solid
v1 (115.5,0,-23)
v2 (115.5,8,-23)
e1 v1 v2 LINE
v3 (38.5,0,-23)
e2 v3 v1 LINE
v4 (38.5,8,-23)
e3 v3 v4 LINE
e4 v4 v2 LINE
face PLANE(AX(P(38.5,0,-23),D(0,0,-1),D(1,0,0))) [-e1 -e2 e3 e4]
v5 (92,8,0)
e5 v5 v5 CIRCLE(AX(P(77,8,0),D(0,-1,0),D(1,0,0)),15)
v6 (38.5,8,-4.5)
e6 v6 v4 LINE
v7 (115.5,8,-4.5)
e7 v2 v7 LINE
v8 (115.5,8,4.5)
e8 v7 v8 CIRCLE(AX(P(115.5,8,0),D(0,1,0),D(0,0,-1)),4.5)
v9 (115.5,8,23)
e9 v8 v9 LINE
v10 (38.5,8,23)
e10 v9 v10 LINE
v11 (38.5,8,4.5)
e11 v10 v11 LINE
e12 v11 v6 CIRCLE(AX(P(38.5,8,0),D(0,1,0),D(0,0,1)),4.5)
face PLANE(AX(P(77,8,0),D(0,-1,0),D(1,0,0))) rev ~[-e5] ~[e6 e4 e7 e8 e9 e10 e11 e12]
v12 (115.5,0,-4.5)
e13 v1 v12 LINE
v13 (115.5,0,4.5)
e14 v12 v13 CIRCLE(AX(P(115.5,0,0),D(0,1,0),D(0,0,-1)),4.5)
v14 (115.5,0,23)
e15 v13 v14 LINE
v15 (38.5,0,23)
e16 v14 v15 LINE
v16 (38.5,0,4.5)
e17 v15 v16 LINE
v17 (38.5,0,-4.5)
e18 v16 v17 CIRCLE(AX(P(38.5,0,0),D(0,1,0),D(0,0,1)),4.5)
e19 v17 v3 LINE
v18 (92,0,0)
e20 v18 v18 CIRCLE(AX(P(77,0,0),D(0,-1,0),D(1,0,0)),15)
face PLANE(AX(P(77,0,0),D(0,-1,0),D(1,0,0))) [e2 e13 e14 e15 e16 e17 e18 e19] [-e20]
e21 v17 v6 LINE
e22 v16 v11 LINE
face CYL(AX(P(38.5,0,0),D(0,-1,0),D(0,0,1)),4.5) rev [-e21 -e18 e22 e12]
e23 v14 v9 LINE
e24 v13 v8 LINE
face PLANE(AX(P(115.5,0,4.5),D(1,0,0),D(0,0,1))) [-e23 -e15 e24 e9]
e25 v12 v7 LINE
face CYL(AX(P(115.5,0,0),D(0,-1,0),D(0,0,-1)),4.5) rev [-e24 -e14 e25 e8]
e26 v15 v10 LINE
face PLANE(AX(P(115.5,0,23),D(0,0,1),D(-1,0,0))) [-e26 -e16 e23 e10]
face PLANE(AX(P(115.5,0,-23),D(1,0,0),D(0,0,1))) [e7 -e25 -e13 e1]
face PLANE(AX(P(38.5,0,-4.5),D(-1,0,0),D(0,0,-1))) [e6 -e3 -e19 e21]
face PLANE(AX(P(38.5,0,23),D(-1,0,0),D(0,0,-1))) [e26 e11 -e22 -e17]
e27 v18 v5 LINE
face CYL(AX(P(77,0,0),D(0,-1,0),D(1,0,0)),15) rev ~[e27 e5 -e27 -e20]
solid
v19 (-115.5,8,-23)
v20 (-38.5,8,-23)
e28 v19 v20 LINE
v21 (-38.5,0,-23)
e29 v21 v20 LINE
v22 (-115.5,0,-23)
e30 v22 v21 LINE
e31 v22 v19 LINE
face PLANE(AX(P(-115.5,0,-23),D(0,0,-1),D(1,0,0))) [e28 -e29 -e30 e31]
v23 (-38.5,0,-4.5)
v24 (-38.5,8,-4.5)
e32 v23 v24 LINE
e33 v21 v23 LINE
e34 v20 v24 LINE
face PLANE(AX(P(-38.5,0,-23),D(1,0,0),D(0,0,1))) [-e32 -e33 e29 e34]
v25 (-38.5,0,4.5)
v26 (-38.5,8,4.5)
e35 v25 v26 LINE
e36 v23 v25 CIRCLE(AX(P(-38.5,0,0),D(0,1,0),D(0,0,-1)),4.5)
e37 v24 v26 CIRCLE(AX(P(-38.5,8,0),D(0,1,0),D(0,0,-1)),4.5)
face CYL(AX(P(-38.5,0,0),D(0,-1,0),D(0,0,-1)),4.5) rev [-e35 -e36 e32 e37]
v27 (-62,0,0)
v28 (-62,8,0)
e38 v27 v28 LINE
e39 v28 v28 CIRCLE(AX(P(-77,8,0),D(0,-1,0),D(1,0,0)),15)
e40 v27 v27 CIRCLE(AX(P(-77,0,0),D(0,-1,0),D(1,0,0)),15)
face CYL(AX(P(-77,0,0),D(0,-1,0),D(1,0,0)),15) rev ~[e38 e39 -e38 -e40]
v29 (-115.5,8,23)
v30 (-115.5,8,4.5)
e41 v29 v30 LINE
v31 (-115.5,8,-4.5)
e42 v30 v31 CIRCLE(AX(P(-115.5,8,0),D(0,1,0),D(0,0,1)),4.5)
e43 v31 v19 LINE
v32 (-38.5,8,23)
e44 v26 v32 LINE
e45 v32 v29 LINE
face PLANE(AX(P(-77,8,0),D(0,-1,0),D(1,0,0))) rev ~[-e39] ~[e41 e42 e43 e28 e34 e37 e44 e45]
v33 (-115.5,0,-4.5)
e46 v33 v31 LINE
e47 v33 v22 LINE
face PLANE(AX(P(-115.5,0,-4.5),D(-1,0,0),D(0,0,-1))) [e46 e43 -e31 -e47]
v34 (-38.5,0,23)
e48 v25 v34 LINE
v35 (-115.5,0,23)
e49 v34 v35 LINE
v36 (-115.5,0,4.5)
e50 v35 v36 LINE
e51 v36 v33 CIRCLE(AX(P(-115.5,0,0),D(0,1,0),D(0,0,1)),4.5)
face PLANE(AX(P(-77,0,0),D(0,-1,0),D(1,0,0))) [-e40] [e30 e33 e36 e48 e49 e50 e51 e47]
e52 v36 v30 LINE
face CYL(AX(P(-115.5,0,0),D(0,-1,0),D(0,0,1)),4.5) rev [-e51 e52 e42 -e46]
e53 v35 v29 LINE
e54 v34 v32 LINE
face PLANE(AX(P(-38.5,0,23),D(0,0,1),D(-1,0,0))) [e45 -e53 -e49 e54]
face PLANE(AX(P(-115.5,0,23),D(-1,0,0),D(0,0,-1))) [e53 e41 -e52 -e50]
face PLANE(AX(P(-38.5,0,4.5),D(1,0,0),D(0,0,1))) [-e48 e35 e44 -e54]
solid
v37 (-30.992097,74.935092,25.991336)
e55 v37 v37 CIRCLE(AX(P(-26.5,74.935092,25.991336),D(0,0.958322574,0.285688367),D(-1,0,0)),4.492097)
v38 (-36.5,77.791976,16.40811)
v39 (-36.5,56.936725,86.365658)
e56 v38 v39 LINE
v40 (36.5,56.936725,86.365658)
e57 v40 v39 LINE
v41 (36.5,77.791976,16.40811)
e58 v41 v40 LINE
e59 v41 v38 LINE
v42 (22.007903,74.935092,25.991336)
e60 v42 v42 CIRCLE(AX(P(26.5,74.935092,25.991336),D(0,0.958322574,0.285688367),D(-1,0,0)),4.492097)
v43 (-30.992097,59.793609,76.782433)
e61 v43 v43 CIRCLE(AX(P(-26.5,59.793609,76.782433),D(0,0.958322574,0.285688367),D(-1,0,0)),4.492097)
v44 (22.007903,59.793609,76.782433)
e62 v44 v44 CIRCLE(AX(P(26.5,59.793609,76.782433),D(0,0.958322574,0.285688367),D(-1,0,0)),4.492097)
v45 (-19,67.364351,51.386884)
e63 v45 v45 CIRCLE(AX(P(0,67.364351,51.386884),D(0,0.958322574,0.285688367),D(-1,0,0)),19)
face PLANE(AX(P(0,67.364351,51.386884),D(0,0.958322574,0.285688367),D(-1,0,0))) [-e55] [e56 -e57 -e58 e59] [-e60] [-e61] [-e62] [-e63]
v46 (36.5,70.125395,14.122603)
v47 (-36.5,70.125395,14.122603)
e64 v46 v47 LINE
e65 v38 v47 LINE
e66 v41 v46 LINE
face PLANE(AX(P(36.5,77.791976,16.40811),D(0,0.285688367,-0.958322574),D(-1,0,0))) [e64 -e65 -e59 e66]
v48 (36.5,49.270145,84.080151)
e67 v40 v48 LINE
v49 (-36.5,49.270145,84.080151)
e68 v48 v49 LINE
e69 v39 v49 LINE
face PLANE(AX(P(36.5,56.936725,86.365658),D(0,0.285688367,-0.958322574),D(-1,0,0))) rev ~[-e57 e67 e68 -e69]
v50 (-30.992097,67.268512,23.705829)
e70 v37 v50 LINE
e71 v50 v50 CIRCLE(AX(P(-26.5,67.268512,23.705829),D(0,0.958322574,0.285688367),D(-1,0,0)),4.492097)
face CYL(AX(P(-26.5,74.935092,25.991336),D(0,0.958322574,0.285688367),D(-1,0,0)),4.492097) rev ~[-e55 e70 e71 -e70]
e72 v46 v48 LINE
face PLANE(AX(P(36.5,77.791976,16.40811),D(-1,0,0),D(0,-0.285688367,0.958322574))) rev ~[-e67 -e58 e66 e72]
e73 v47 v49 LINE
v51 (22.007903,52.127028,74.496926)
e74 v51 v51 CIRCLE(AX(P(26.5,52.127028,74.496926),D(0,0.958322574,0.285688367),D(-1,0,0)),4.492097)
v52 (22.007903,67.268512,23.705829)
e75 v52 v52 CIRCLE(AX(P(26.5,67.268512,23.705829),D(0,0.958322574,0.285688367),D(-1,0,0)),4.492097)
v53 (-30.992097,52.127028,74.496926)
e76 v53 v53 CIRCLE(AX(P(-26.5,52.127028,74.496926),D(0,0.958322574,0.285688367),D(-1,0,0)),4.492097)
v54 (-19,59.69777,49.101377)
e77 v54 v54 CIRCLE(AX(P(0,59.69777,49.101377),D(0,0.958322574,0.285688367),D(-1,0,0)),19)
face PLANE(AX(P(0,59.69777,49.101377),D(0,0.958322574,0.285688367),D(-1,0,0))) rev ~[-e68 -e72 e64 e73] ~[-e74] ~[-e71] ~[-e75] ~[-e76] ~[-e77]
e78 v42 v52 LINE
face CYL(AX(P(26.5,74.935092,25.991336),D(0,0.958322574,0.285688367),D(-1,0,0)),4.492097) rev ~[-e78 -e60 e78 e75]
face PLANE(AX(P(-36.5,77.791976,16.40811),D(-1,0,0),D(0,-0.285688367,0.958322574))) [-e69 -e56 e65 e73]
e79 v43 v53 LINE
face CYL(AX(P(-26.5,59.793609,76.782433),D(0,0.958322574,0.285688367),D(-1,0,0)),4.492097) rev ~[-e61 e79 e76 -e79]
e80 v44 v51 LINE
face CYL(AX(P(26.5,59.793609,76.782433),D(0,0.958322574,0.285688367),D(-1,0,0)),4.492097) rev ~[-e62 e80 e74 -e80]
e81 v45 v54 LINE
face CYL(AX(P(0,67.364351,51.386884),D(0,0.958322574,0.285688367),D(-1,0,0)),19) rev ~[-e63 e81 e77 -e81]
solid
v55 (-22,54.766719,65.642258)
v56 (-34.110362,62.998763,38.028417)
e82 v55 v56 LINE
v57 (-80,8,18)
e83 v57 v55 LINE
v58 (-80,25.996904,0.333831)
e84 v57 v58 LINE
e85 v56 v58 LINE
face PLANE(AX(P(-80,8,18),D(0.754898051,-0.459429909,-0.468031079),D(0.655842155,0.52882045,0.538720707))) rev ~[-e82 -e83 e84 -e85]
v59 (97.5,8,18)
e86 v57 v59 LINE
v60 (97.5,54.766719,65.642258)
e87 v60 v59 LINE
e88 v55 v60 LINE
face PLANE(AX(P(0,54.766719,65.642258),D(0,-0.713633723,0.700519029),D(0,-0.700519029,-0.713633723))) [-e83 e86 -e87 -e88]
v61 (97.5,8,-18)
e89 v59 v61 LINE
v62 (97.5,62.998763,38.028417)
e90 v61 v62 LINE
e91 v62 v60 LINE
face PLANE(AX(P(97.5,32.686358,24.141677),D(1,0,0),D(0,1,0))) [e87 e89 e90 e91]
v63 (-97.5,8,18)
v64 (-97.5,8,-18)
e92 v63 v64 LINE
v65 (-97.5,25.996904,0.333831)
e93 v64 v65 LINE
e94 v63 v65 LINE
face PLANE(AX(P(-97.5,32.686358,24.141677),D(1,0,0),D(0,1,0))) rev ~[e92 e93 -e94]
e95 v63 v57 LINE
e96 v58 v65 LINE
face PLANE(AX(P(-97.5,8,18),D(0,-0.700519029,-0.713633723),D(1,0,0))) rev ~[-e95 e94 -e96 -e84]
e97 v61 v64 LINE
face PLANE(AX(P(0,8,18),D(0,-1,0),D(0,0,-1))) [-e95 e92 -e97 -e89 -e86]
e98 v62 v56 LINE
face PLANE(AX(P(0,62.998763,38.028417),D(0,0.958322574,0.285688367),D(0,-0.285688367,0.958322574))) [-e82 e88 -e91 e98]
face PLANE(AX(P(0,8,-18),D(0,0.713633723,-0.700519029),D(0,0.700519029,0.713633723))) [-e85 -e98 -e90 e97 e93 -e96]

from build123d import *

# Parameters (mm, degrees)
F0_R     = 15
F1_DEPTH = 8
F4_W     = 73
F4_H     = 73
F4_R     = 4.4920969668
F4_R_2   = 19
F5_DEPTH = 8
F7_DEPTH = 97.5
F9_DEPTH = 78.5281878747


with BuildPart() as f1:
    # F0 (on Front) → F1 (new body)
    with BuildSketch(Plane.XZ):
        with BuildLine():
            Line((-38.5, 23), (-115.5, 23))
            Line((-115.5, 23), (-115.5, 4.5))
            ThreePointArc((-115.5, 4.5), (-111, 0), (-115.5, -4.5))
            Line((-115.5, -4.5), (-115.5, -23))
            Line((-115.5, -23), (-38.5, -23))
            Line((-38.5, -23), (-38.5, -4.5))
            ThreePointArc((-38.5, -4.5), (-43, 0), (-38.5, 4.5))
            Line((-38.5, 4.5), (-38.5, 23))
        make_face()
        with Locations((-77, 0)):
            Circle(F0_R, mode=Mode.SUBTRACT)
    extrude(amount=-F1_DEPTH)


with BuildPart() as f1b:
    # F0 (on Front) → F1, piece 2 (new body)
    with BuildSketch(Plane.XZ):
        with BuildLine():
            Line((115.5, 23), (38.5, 23))
            Line((38.5, 23), (38.5, 4.5))
            ThreePointArc((38.5, 4.5), (43, 0), (38.5, -4.5))
            Line((38.5, -4.5), (38.5, -23))
            Line((38.5, -23), (115.5, -23))
            Line((115.5, -23), (115.5, -4.5))
            ThreePointArc((115.5, -4.5), (111, 0), (115.5, 4.5))
            Line((115.5, 4.5), (115.5, 23))
        make_face()
        with Locations((77, 0)):
            Circle(F0_R, mode=Mode.SUBTRACT)
    extrude(amount=-F1_DEPTH)


with BuildPart() as f5:
    # F4 (on face) → F5 (new body)
    with BuildSketch(Plane(origin=(0, 75.9350016642, 22.6372071705), x_dir=(-1, 0, 0), z_dir=(0, 0.9583225745, 0.2856883674))):
        with Locations((0, 30)):
            Rectangle(F4_W, F4_H)
        with Locations((-26.5, 3.5)):
            Circle(F4_R, mode=Mode.SUBTRACT)
        with Locations((26.5, 3.5)):
            Circle(F4_R, mode=Mode.SUBTRACT)
        with Locations((-26.5, 56.5)):
            Circle(F4_R, mode=Mode.SUBTRACT)
        with Locations((0, 30)):
            Circle(F4_R_2, mode=Mode.SUBTRACT)
        with Locations((26.5, 56.5)):
            Circle(F4_R, mode=Mode.SUBTRACT)
    extrude(amount=-F5_DEPTH)


with BuildPart() as f7:
    # F6 (on Right) → F7 (new body, symmetric)
    with BuildSketch(Plane.YZ):
        Polygon((62.9987630306, 38.0284166596), (54.7667194692, 65.6422577498), (8, 18), (8, -18), align=None)
    extrude(amount=F7_DEPTH, both=True)

    # F8 (on face) → F9 (cut, through all)
    with BuildSketch(Plane(origin=(0, -4.9242673194, 4.8337723525), x_dir=(1, 0, 0), z_dir=(0, -0.7136337229, 0.7005190287))):
        Polygon((-80, 18.4495592417), (-22, 85.209657904), (-97.5, 85.209657904), (-97.5, 18.4495592417), align=None)
    extrude(amount=-F9_DEPTH, mode=Mode.SUBTRACT)


solid = Compound([f1.part, f1b.part, f5.part, f7.part])
